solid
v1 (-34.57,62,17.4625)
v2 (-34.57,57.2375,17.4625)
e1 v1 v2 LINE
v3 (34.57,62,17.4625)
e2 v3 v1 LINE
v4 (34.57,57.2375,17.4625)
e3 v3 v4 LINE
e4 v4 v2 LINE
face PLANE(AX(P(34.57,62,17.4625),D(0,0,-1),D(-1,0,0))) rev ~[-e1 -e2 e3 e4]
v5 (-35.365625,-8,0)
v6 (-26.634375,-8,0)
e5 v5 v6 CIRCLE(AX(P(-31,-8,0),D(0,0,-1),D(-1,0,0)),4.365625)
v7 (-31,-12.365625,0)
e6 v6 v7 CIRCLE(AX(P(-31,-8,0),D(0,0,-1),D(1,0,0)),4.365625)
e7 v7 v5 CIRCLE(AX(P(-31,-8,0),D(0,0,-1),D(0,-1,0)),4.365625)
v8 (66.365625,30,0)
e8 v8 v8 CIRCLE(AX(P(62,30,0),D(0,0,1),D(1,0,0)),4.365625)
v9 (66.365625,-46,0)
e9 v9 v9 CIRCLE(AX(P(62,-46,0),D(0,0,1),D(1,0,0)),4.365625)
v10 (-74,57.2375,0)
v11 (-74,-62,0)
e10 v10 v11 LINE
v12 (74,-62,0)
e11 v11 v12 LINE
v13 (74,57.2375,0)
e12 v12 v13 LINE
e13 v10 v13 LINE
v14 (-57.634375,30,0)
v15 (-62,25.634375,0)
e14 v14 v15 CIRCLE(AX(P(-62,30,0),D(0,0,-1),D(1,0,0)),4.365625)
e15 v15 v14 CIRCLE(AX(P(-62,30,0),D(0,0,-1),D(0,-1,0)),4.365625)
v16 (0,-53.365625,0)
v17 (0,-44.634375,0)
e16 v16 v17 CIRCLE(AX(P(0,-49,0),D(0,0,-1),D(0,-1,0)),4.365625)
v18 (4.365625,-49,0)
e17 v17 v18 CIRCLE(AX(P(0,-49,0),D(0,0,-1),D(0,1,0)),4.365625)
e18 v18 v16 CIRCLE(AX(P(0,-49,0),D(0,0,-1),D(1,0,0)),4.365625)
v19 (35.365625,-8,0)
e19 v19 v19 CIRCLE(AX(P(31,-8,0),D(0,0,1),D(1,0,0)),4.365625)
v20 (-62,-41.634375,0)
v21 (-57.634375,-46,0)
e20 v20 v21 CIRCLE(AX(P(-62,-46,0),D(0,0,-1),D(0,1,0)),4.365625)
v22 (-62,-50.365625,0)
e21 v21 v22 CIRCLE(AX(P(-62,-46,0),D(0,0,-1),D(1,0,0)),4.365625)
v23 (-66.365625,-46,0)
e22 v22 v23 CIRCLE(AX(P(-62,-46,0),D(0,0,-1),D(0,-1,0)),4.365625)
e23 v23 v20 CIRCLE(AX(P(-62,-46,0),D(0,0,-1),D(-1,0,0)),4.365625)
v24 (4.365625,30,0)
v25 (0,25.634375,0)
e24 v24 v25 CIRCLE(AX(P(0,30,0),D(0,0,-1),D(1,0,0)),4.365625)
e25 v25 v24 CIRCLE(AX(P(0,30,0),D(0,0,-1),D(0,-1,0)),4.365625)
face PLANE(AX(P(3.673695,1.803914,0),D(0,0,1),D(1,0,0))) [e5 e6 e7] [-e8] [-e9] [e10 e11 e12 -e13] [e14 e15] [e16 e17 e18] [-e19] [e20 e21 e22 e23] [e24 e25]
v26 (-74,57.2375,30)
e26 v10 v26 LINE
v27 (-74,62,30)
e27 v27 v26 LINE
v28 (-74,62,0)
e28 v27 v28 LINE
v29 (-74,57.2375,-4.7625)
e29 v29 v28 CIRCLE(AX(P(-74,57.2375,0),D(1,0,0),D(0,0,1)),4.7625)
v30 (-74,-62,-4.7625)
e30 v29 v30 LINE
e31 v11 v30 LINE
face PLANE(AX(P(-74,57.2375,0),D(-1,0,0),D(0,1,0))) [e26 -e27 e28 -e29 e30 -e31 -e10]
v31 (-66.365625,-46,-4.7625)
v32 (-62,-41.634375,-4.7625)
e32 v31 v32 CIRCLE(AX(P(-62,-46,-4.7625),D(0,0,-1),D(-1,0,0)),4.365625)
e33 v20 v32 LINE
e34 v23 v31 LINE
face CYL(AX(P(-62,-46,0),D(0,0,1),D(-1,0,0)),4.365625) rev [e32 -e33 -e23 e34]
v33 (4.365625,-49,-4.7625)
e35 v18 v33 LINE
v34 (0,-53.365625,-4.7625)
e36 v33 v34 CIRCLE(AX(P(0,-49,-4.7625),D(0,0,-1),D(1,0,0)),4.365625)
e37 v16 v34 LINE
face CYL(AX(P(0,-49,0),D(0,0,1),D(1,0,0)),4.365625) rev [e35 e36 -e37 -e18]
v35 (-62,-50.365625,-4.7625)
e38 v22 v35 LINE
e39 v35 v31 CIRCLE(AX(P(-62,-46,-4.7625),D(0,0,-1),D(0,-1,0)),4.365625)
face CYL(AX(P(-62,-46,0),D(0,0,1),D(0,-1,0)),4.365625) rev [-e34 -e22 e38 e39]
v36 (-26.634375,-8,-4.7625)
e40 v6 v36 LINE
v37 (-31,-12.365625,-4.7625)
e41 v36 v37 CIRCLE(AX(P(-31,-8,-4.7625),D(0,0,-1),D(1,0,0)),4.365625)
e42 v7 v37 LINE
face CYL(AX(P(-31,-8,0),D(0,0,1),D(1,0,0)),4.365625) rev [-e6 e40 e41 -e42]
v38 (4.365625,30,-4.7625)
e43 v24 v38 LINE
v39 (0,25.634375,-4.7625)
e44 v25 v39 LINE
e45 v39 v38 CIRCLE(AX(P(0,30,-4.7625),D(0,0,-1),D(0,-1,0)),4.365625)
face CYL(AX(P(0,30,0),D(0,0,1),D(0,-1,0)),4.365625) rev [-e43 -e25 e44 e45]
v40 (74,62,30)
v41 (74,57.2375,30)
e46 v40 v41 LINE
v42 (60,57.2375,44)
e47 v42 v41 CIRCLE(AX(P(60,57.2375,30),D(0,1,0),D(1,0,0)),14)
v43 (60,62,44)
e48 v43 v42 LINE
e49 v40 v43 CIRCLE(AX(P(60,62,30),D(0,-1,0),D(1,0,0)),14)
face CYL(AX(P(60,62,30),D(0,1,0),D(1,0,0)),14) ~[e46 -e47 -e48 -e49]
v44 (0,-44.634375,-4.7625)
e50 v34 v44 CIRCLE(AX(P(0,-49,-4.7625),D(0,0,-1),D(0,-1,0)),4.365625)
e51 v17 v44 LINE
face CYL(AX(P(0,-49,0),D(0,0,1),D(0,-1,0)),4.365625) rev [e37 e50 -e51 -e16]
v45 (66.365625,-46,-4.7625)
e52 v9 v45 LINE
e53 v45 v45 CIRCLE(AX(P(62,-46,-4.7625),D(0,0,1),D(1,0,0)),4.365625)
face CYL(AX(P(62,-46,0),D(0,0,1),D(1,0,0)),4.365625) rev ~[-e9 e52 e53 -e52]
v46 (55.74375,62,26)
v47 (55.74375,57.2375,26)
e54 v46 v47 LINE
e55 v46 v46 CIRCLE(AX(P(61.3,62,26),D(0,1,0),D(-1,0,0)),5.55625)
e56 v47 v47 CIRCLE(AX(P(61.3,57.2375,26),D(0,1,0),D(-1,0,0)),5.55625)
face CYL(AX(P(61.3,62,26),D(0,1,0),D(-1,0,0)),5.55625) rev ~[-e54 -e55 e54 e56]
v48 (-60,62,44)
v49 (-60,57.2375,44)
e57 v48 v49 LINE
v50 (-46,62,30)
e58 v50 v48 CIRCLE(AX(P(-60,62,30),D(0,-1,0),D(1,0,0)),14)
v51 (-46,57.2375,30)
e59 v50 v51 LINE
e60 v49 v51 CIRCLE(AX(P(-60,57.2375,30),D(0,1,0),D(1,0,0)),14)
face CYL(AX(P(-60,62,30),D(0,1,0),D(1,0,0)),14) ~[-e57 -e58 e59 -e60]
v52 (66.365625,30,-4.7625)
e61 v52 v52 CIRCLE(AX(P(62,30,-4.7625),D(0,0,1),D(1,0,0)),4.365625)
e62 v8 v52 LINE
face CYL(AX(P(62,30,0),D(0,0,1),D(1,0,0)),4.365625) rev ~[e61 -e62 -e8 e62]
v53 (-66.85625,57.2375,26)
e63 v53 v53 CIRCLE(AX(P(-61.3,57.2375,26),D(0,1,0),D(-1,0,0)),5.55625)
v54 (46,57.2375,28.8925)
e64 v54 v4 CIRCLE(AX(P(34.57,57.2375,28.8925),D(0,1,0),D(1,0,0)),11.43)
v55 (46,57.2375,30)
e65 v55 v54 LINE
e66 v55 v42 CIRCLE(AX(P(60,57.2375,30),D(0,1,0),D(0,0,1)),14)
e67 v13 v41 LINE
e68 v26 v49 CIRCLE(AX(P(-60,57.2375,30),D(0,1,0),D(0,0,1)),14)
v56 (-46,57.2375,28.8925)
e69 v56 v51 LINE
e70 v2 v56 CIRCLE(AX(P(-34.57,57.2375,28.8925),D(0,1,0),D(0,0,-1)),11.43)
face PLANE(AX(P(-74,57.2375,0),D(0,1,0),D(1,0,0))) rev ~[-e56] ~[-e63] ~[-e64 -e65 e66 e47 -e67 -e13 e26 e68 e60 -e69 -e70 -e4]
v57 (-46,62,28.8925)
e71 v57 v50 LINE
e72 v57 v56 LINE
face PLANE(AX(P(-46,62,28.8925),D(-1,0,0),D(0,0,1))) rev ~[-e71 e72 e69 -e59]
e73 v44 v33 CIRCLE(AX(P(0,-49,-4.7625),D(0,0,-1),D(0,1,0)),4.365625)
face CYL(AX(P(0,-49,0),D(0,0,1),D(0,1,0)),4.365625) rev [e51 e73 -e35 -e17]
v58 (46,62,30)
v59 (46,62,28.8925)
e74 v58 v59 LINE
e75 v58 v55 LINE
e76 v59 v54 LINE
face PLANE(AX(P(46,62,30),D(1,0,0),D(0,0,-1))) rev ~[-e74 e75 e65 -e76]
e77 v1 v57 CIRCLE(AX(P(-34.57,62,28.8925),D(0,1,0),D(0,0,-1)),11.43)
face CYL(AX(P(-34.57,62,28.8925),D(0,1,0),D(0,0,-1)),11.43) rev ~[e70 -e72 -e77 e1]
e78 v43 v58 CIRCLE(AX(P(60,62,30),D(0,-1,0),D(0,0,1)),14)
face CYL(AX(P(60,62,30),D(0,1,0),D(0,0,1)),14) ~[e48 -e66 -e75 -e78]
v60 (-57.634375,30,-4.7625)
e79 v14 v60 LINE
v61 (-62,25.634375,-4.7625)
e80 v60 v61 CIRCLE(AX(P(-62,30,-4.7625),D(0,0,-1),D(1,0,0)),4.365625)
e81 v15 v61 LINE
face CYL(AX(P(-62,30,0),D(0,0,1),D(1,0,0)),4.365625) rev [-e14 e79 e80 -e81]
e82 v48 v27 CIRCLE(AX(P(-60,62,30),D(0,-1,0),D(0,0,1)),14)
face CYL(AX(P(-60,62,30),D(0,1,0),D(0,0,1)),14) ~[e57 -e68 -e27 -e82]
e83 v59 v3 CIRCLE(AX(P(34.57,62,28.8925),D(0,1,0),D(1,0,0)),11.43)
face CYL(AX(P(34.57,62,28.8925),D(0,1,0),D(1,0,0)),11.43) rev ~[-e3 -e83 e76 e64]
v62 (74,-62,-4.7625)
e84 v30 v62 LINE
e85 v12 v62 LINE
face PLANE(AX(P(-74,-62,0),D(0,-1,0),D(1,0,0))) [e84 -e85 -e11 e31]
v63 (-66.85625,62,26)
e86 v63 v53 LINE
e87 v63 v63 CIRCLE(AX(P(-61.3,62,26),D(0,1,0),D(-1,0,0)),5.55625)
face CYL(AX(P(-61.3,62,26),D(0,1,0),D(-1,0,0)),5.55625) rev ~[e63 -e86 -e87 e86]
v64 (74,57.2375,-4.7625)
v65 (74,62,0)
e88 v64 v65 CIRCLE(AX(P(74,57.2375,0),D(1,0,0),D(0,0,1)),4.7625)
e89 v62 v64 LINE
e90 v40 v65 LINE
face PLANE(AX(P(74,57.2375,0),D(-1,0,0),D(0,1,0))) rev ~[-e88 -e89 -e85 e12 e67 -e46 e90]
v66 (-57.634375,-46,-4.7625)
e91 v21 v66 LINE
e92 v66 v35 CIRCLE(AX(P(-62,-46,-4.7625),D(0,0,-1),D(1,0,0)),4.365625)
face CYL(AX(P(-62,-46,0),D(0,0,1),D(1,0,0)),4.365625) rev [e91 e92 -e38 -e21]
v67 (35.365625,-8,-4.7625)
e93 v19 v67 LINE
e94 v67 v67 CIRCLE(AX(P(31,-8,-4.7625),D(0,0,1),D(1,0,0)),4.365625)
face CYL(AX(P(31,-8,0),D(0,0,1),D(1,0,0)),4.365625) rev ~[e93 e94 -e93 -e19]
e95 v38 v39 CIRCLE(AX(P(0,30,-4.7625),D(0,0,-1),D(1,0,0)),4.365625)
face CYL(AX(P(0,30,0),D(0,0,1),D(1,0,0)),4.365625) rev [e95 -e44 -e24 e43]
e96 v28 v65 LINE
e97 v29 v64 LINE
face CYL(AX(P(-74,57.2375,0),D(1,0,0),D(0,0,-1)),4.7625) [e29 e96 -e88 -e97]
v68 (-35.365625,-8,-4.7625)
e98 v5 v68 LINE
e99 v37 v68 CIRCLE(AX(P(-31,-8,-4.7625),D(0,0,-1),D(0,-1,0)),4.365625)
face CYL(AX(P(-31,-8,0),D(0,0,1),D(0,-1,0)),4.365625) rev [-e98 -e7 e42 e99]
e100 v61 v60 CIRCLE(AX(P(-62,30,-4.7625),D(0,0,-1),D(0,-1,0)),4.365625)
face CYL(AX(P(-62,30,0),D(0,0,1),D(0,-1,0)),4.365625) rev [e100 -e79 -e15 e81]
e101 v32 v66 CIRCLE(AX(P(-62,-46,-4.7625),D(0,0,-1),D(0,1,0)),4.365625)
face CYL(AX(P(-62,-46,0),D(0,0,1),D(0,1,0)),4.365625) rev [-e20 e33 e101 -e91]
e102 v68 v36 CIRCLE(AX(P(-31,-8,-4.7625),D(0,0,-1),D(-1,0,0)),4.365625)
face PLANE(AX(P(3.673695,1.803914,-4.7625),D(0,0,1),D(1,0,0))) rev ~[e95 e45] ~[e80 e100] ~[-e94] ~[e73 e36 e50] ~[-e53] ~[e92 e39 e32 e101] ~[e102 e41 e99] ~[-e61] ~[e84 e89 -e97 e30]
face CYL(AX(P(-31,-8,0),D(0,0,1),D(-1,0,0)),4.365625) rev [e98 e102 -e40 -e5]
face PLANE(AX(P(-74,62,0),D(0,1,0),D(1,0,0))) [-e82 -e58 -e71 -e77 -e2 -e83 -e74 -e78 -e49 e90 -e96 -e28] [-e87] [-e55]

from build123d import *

# Parameters (mm, degrees)
F0_R     = 4.365625
F0_W     = 148
F0_H     = 4.7625
F1_DEPTH = 4.7625
F2_DEPTH = 44
F3_R     = 4.7625
F4_R     = 5.55625
F5_DEPTH = 6.35


# Not quite as in the source:
# - a feature names something its author has since deleted; it is built from what else it names


with BuildPart() as f1:
    # F0 (on Top) → F1 (new body)
    with BuildSketch(Plane.XY):
        with BuildLine():
            Line((-31, -12.365625), (-31, -62))
            Line((-31, -62), (0, -62))
            Line((0, -62), (74, -62))
            Line((74, -62), (74, 57.2375))
            Line((74, 57.2375), (-74, 57.2375))
            Line((-74, 57.2375), (-74, -8))
            Line((-74, -8), (-62, -8))
            Line((-62, -8), (-35.365625, -8))
            ThreePointArc((-35.365625, -8), (-31, -3.634375), (-26.634375, -8))
            ThreePointArc((-26.634375, -8), (-27.9130369584, -11.0869630416), (-31, -12.365625))
        make_face()
        with BuildLine():
            ThreePointArc((4.365625, -49), (3.0869630416, -52.0869630416), (0, -53.365625))
            ThreePointArc((0, -53.365625), (-4.365625, -49), (0, -44.634375))
            ThreePointArc((0, -44.634375), (3.0869630416, -45.9130369584), (4.365625, -49))
        make_face(mode=Mode.SUBTRACT)
        with Locations((62, -46)):
            Circle(F0_R, mode=Mode.SUBTRACT)
        with Locations((31, -8)):
            Circle(F0_R, mode=Mode.SUBTRACT)
        with BuildLine():
            ThreePointArc((-57.634375, 30), (-58.9130369584, 26.9130369584), (-62, 25.634375))
            ThreePointArc((-62, 25.634375), (-65.0869630416, 33.0869630416), (-57.634375, 30))
        make_face(mode=Mode.SUBTRACT)
        with BuildLine():
            ThreePointArc((4.365625, 30), (3.0869630416, 26.9130369584), (0, 25.634375))
            ThreePointArc((0, 25.634375), (-3.0869630416, 33.0869630416), (4.365625, 30))
        make_face(mode=Mode.SUBTRACT)
        with Locations((62, 30)):
            Circle(F0_R, mode=Mode.SUBTRACT)
        with Locations((0, 59.61875)):
            Rectangle(F0_W, F0_H)
        with BuildLine():
            Line((-62, -50.365625), (-62, -62))
            Line((-62, -62), (-31, -62))
            Line((-31, -62), (-31, -12.365625))
            ThreePointArc((-31, -12.365625), (-34.0869630416, -11.0869630416), (-35.365625, -8))
            Line((-35.365625, -8), (-62, -8))
            Line((-62, -8), (-62, -41.634375))
            ThreePointArc((-62, -41.634375), (-58.9130369584, -42.9130369584), (-57.634375, -46))
            ThreePointArc((-57.634375, -46), (-58.9130369584, -49.0869630416), (-62, -50.365625))
        make_face()
        with BuildLine():
            Line((-74, -8), (-74, -46))
            Line((-74, -46), (-66.365625, -46))
            ThreePointArc((-66.365625, -46), (-65.0869630416, -42.9130369584), (-62, -41.634375))
            Line((-62, -41.634375), (-62, -8))
            Line((-62, -8), (-74, -8))
        make_face()
        with BuildLine():
            Line((-74, -46), (-74, -62))
            Line((-74, -62), (-62, -62))
            Line((-62, -62), (-62, -50.365625))
            ThreePointArc((-62, -50.365625), (-65.0869630416, -49.0869630416), (-66.365625, -46))
            Line((-66.365625, -46), (-74, -46))
        make_face()
    extrude(amount=-F1_DEPTH)

    # F0 (on Top) → F2 (join)
    with BuildSketch(Plane.XY):
        with Locations((0, 59.61875)):
            Rectangle(F0_W, F0_H)
    extrude(amount=F2_DEPTH)

    # F3
    f3_edges = [f1.edges().sort_by_distance(p)[0] for p in [
        (0, 62, -4.7625),
    ]]
    fillet(f3_edges, radius=F3_R)

    # F4 (on face) → F5 (cut)
    with BuildSketch(Plane(origin=(0, 62, 0), x_dir=(-1, 0, 0), z_dir=(0, 1, 0))):
        with BuildLine():
            ThreePointArc((-60, 44), (-50.1005050634, 39.8994949366), (-46, 30))
            Line((-46, 30), (-46, 28.8925))
            ThreePointArc((-46, 28.8925), (-42.652230509, 20.810269491), (-34.57, 17.4625))
            Line((-34.57, 17.4625), (0, 17.4625))
            Line((0, 17.4625), (34.57, 17.4625))
            ThreePointArc((34.57, 17.4625), (42.652230509, 20.810269491), (46, 28.8925))
            Line((46, 28.8925), (46, 30))
            ThreePointArc((46, 30), (50.1005050634, 39.8994949366), (60, 44))
            Line((60, 44), (59.7125, 44))
            Line((59.7125, 44), (-60, 44))
        make_face()
        with BuildLine():
            Line((74, 44), (60, 44))
            ThreePointArc((60, 44), (69.8994949366, 39.8994949366), (74, 30))
            Line((74, 30), (74, 44))
        make_face()
        with Locations((-61.3, 26)):
            Circle(F4_R)
        with Locations((61.3, 26)):
            Circle(F4_R)
        with BuildLine():
            ThreePointArc((-74, 30), (-69.8994949366, 39.8994949366), (-60, 44))
            Line((-60, 44), (-74, 44))
            Line((-74, 44), (-74, 30))
        make_face()
    extrude(amount=-F5_DEPTH, mode=Mode.SUBTRACT)


solid = f1.part
